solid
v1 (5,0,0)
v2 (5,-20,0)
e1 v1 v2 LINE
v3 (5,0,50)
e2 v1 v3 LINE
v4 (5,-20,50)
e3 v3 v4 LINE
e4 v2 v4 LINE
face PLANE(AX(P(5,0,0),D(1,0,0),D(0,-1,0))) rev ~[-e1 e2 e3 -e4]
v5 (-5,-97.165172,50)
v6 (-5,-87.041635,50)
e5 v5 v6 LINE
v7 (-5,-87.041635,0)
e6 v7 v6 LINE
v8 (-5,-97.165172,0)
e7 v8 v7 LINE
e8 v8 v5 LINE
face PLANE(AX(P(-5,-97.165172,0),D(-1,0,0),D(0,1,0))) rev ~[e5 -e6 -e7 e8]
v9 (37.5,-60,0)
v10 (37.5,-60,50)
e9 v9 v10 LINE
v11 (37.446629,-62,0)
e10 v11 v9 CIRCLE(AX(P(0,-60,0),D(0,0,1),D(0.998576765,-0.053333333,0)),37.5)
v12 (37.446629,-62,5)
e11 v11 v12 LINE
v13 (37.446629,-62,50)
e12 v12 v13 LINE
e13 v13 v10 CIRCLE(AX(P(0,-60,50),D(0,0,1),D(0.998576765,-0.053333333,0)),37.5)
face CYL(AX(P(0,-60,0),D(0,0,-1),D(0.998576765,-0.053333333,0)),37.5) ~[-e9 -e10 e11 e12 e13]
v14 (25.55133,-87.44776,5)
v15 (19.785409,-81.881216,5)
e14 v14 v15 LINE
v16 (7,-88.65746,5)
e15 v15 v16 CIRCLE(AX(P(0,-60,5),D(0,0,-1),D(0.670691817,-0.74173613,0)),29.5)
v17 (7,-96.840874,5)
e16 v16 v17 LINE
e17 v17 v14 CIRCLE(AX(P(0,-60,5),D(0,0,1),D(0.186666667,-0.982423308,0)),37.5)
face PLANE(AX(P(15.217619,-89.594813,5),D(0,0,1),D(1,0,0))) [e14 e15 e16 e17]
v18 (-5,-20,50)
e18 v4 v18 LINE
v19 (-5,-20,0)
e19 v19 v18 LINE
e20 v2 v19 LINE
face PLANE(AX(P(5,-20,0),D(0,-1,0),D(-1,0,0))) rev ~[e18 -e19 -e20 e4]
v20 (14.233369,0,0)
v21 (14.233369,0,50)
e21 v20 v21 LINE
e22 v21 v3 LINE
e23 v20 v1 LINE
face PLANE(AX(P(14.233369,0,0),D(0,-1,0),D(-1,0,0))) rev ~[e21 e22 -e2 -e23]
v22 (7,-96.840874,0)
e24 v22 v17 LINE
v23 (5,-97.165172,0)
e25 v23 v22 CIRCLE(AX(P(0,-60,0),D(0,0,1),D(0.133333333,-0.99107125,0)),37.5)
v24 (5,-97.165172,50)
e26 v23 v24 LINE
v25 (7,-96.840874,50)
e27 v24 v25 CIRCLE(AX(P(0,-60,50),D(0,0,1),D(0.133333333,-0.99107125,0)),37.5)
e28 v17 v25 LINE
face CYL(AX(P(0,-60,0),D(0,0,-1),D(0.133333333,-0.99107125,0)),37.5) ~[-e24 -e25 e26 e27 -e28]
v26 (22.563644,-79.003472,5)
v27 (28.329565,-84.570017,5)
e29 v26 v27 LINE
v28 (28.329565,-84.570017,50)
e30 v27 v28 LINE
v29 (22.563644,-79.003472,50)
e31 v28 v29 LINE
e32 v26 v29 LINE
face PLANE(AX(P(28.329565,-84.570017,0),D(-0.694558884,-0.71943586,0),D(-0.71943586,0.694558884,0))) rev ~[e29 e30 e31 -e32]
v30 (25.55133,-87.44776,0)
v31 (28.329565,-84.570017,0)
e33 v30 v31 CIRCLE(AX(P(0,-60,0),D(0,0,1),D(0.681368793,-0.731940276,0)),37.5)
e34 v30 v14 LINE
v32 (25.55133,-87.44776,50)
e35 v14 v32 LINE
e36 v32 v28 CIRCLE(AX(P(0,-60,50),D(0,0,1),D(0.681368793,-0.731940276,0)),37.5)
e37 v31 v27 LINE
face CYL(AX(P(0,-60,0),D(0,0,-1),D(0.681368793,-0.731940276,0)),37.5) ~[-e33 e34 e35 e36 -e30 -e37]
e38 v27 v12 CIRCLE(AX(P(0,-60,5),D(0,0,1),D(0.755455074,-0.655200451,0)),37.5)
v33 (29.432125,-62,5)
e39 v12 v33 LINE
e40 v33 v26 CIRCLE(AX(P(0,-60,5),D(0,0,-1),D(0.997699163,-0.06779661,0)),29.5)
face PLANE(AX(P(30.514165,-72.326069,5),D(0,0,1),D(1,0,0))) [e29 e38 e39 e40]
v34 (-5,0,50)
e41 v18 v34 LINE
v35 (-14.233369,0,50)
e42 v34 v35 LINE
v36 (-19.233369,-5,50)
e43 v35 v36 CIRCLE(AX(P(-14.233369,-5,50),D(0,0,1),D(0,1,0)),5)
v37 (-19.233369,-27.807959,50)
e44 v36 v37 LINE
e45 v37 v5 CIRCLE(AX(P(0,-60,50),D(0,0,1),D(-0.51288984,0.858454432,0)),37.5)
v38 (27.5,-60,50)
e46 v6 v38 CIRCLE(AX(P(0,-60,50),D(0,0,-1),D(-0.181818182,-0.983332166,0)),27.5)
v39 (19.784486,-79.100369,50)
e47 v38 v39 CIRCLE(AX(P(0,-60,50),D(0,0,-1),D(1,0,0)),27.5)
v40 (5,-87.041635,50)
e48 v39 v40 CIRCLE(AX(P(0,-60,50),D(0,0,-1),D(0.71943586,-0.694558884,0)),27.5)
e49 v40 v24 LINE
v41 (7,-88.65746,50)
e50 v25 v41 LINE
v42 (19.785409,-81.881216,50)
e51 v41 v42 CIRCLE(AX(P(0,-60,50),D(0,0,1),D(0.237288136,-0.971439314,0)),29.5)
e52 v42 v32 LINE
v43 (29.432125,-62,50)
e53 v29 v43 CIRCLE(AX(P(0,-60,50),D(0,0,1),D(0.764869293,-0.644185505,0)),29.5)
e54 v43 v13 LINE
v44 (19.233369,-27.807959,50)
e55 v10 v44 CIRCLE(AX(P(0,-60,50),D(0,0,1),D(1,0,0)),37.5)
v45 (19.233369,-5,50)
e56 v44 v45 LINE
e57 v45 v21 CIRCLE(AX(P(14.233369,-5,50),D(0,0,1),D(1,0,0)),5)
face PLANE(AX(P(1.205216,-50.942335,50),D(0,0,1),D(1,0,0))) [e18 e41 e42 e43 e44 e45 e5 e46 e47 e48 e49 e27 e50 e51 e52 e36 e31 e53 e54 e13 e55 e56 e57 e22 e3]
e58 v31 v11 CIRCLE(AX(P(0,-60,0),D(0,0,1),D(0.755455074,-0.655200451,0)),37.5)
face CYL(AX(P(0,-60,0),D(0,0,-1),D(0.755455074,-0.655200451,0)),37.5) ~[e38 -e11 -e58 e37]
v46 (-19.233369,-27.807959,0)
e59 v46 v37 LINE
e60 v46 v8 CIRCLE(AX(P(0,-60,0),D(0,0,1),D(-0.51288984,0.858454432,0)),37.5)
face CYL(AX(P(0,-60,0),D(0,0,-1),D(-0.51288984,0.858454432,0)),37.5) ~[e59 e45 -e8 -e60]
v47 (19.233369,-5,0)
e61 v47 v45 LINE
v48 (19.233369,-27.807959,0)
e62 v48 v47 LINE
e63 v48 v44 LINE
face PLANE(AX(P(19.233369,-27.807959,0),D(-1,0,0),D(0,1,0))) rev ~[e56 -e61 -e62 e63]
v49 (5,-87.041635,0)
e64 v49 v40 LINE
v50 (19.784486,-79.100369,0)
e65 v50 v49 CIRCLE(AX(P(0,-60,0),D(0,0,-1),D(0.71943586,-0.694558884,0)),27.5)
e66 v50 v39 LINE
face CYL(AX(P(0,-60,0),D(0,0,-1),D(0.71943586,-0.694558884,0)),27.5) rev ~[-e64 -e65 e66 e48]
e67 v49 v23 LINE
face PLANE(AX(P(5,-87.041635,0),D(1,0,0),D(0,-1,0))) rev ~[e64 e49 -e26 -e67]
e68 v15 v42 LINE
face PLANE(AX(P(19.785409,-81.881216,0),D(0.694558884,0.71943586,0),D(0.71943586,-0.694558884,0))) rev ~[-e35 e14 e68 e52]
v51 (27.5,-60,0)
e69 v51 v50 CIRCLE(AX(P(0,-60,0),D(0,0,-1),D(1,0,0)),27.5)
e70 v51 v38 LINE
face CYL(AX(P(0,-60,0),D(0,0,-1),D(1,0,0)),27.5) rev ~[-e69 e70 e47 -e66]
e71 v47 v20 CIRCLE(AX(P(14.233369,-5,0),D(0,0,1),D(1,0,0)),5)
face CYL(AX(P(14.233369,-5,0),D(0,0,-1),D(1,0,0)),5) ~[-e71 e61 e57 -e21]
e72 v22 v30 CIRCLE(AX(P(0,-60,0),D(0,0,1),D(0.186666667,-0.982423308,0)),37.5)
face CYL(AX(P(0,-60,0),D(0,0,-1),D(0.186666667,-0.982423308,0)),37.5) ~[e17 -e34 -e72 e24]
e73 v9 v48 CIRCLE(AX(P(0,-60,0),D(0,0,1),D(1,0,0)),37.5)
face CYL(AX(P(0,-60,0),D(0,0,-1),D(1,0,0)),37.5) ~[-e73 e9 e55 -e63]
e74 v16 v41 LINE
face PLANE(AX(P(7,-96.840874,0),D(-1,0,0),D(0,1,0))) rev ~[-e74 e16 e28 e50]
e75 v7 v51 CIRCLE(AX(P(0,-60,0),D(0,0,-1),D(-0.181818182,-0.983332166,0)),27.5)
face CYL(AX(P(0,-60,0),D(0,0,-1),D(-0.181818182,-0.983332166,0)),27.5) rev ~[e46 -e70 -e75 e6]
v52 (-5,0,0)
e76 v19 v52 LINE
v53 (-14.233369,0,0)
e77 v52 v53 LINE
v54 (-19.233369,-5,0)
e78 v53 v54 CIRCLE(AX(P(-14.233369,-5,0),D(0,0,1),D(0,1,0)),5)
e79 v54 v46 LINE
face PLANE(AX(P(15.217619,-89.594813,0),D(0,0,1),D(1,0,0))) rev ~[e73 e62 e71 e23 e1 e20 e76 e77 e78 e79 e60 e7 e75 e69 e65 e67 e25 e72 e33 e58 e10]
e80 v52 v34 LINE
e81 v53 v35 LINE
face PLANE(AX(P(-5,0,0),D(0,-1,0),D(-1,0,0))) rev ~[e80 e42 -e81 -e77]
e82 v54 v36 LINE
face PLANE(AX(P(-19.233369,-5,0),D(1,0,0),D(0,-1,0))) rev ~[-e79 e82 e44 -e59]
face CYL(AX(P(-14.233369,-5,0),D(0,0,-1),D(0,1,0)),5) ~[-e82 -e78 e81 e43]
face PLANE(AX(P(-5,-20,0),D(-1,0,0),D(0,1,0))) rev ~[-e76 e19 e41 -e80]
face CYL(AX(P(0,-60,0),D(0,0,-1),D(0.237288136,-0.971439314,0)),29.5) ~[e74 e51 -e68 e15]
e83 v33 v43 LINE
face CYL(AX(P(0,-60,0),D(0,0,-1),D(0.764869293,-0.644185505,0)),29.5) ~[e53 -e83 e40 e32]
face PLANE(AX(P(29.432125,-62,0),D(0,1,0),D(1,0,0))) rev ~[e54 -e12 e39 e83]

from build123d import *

# Parameters (mm, degrees)
F1_DEPTH = 50
F2_DEPTH = 5


# Not quite as in the source:
# - a feature of the source that left no trace in its solid (it failed there, or was rolled back) is left out


with BuildPart() as f1:
    # F0 (on Top) → F1 (new body)
    with BuildSketch(Plane.XY):
        with BuildLine():
            Line((-19.2333690145, -5), (-19.2333690145, -27.8079588042))
            ThreePointArc((-19.2333690145, -27.8079588042), (-36.7344496958, -67.5385811362), (-5, -97.1651718683))
            Line((-5, -97.1651718683), (-5, -87.041634566))
            ThreePointArc((-5, -87.041634566), (-17.5890590993, -38.8605818434), (27.5, -60))
            ThreePointArc((27.5, -60), (25.4982682633, -70.2999182314), (19.7844861402, -79.1003693203))
            ThreePointArc((19.7844861402, -79.1003693203), (13.0128248945, -84.2263573049), (5, -87.041634566))
            Line((5, -87.041634566), (5, -97.1651718683))
            ThreePointArc((5, -97.1651718683), (6.0021906226, -97.0165328972), (7, -96.8408740396))
            Line((7, -96.8408740396), (7, -88.6574597618))
            ThreePointArc((7, -88.6574597618), (13.8146262679, -86.0654196413), (19.7854086015, -81.8812158362))
            Line((19.7854086015, -81.8812158362), (25.5513297312, -87.4477603634))
            ThreePointArc((25.5513297312, -87.4477603634), (26.9788447366, -86.045958164), (28.3295652687, -84.5700169249))
            Line((28.3295652687, -84.5700169249), (22.563644139, -79.0034723976))
            ThreePointArc((22.563644139, -79.0034723976), (27.3526877734, -71.0490031936), (29.4321253055, -62))
            Line((29.4321253055, -62), (37.4466286867, -62))
            ThreePointArc((37.4466286867, -62), (37.4866547971, -61.0003559988), (37.5, -60))
            ThreePointArc((37.5, -60), (32.6151907709, -41.4932625517), (19.2333690145, -27.8079588042))
            Line((19.2333690145, -27.8079588042), (19.2333690145, -5))
            ThreePointArc((19.2333690145, -5), (17.7689029204, -1.4644660941), (14.2333690145, 0))
            Line((14.2333690145, 0), (5, 0))
            Line((5, 0), (5, -20))
            Line((5, -20), (0, -20))
            Line((0, -20), (-5, -20))
            Line((-5, -20), (-5, 0))
            Line((-5, 0), (-14.2333690145, 0))
            ThreePointArc((-14.2333690145, 0), (-17.7689029204, -1.4644660941), (-19.2333690145, -5))
        make_face()
    extrude(amount=F1_DEPTH)

    # F0 (on Top) → F2 (join)
    with BuildSketch(Plane.XY):
        with BuildLine():
            Line((7, -88.6574597618), (7, -96.8408740396))
            ThreePointArc((7, -96.8408740396), (16.9397435916, -93.4558677522), (25.5513297312, -87.4477603634))
            Line((25.5513297312, -87.4477603634), (19.7854086015, -81.8812158362))
            ThreePointArc((19.7854086015, -81.8812158362), (13.8146262679, -86.0654196413), (7, -88.6574597618))
        make_face()
        with BuildLine():
            Line((22.563644139, -79.0034723976), (28.3295652687, -84.5700169249))
            ThreePointArc((28.3295652687, -84.5700169249), (34.7703658136, -74.0453430428), (37.4466286867, -62))
            Line((37.4466286867, -62), (29.4321253055, -62))
            ThreePointArc((29.4321253055, -62), (27.3526877734, -71.0490031936), (22.563644139, -79.0034723976))
        make_face()
    extrude(amount=F2_DEPTH)


solid = f1.part
